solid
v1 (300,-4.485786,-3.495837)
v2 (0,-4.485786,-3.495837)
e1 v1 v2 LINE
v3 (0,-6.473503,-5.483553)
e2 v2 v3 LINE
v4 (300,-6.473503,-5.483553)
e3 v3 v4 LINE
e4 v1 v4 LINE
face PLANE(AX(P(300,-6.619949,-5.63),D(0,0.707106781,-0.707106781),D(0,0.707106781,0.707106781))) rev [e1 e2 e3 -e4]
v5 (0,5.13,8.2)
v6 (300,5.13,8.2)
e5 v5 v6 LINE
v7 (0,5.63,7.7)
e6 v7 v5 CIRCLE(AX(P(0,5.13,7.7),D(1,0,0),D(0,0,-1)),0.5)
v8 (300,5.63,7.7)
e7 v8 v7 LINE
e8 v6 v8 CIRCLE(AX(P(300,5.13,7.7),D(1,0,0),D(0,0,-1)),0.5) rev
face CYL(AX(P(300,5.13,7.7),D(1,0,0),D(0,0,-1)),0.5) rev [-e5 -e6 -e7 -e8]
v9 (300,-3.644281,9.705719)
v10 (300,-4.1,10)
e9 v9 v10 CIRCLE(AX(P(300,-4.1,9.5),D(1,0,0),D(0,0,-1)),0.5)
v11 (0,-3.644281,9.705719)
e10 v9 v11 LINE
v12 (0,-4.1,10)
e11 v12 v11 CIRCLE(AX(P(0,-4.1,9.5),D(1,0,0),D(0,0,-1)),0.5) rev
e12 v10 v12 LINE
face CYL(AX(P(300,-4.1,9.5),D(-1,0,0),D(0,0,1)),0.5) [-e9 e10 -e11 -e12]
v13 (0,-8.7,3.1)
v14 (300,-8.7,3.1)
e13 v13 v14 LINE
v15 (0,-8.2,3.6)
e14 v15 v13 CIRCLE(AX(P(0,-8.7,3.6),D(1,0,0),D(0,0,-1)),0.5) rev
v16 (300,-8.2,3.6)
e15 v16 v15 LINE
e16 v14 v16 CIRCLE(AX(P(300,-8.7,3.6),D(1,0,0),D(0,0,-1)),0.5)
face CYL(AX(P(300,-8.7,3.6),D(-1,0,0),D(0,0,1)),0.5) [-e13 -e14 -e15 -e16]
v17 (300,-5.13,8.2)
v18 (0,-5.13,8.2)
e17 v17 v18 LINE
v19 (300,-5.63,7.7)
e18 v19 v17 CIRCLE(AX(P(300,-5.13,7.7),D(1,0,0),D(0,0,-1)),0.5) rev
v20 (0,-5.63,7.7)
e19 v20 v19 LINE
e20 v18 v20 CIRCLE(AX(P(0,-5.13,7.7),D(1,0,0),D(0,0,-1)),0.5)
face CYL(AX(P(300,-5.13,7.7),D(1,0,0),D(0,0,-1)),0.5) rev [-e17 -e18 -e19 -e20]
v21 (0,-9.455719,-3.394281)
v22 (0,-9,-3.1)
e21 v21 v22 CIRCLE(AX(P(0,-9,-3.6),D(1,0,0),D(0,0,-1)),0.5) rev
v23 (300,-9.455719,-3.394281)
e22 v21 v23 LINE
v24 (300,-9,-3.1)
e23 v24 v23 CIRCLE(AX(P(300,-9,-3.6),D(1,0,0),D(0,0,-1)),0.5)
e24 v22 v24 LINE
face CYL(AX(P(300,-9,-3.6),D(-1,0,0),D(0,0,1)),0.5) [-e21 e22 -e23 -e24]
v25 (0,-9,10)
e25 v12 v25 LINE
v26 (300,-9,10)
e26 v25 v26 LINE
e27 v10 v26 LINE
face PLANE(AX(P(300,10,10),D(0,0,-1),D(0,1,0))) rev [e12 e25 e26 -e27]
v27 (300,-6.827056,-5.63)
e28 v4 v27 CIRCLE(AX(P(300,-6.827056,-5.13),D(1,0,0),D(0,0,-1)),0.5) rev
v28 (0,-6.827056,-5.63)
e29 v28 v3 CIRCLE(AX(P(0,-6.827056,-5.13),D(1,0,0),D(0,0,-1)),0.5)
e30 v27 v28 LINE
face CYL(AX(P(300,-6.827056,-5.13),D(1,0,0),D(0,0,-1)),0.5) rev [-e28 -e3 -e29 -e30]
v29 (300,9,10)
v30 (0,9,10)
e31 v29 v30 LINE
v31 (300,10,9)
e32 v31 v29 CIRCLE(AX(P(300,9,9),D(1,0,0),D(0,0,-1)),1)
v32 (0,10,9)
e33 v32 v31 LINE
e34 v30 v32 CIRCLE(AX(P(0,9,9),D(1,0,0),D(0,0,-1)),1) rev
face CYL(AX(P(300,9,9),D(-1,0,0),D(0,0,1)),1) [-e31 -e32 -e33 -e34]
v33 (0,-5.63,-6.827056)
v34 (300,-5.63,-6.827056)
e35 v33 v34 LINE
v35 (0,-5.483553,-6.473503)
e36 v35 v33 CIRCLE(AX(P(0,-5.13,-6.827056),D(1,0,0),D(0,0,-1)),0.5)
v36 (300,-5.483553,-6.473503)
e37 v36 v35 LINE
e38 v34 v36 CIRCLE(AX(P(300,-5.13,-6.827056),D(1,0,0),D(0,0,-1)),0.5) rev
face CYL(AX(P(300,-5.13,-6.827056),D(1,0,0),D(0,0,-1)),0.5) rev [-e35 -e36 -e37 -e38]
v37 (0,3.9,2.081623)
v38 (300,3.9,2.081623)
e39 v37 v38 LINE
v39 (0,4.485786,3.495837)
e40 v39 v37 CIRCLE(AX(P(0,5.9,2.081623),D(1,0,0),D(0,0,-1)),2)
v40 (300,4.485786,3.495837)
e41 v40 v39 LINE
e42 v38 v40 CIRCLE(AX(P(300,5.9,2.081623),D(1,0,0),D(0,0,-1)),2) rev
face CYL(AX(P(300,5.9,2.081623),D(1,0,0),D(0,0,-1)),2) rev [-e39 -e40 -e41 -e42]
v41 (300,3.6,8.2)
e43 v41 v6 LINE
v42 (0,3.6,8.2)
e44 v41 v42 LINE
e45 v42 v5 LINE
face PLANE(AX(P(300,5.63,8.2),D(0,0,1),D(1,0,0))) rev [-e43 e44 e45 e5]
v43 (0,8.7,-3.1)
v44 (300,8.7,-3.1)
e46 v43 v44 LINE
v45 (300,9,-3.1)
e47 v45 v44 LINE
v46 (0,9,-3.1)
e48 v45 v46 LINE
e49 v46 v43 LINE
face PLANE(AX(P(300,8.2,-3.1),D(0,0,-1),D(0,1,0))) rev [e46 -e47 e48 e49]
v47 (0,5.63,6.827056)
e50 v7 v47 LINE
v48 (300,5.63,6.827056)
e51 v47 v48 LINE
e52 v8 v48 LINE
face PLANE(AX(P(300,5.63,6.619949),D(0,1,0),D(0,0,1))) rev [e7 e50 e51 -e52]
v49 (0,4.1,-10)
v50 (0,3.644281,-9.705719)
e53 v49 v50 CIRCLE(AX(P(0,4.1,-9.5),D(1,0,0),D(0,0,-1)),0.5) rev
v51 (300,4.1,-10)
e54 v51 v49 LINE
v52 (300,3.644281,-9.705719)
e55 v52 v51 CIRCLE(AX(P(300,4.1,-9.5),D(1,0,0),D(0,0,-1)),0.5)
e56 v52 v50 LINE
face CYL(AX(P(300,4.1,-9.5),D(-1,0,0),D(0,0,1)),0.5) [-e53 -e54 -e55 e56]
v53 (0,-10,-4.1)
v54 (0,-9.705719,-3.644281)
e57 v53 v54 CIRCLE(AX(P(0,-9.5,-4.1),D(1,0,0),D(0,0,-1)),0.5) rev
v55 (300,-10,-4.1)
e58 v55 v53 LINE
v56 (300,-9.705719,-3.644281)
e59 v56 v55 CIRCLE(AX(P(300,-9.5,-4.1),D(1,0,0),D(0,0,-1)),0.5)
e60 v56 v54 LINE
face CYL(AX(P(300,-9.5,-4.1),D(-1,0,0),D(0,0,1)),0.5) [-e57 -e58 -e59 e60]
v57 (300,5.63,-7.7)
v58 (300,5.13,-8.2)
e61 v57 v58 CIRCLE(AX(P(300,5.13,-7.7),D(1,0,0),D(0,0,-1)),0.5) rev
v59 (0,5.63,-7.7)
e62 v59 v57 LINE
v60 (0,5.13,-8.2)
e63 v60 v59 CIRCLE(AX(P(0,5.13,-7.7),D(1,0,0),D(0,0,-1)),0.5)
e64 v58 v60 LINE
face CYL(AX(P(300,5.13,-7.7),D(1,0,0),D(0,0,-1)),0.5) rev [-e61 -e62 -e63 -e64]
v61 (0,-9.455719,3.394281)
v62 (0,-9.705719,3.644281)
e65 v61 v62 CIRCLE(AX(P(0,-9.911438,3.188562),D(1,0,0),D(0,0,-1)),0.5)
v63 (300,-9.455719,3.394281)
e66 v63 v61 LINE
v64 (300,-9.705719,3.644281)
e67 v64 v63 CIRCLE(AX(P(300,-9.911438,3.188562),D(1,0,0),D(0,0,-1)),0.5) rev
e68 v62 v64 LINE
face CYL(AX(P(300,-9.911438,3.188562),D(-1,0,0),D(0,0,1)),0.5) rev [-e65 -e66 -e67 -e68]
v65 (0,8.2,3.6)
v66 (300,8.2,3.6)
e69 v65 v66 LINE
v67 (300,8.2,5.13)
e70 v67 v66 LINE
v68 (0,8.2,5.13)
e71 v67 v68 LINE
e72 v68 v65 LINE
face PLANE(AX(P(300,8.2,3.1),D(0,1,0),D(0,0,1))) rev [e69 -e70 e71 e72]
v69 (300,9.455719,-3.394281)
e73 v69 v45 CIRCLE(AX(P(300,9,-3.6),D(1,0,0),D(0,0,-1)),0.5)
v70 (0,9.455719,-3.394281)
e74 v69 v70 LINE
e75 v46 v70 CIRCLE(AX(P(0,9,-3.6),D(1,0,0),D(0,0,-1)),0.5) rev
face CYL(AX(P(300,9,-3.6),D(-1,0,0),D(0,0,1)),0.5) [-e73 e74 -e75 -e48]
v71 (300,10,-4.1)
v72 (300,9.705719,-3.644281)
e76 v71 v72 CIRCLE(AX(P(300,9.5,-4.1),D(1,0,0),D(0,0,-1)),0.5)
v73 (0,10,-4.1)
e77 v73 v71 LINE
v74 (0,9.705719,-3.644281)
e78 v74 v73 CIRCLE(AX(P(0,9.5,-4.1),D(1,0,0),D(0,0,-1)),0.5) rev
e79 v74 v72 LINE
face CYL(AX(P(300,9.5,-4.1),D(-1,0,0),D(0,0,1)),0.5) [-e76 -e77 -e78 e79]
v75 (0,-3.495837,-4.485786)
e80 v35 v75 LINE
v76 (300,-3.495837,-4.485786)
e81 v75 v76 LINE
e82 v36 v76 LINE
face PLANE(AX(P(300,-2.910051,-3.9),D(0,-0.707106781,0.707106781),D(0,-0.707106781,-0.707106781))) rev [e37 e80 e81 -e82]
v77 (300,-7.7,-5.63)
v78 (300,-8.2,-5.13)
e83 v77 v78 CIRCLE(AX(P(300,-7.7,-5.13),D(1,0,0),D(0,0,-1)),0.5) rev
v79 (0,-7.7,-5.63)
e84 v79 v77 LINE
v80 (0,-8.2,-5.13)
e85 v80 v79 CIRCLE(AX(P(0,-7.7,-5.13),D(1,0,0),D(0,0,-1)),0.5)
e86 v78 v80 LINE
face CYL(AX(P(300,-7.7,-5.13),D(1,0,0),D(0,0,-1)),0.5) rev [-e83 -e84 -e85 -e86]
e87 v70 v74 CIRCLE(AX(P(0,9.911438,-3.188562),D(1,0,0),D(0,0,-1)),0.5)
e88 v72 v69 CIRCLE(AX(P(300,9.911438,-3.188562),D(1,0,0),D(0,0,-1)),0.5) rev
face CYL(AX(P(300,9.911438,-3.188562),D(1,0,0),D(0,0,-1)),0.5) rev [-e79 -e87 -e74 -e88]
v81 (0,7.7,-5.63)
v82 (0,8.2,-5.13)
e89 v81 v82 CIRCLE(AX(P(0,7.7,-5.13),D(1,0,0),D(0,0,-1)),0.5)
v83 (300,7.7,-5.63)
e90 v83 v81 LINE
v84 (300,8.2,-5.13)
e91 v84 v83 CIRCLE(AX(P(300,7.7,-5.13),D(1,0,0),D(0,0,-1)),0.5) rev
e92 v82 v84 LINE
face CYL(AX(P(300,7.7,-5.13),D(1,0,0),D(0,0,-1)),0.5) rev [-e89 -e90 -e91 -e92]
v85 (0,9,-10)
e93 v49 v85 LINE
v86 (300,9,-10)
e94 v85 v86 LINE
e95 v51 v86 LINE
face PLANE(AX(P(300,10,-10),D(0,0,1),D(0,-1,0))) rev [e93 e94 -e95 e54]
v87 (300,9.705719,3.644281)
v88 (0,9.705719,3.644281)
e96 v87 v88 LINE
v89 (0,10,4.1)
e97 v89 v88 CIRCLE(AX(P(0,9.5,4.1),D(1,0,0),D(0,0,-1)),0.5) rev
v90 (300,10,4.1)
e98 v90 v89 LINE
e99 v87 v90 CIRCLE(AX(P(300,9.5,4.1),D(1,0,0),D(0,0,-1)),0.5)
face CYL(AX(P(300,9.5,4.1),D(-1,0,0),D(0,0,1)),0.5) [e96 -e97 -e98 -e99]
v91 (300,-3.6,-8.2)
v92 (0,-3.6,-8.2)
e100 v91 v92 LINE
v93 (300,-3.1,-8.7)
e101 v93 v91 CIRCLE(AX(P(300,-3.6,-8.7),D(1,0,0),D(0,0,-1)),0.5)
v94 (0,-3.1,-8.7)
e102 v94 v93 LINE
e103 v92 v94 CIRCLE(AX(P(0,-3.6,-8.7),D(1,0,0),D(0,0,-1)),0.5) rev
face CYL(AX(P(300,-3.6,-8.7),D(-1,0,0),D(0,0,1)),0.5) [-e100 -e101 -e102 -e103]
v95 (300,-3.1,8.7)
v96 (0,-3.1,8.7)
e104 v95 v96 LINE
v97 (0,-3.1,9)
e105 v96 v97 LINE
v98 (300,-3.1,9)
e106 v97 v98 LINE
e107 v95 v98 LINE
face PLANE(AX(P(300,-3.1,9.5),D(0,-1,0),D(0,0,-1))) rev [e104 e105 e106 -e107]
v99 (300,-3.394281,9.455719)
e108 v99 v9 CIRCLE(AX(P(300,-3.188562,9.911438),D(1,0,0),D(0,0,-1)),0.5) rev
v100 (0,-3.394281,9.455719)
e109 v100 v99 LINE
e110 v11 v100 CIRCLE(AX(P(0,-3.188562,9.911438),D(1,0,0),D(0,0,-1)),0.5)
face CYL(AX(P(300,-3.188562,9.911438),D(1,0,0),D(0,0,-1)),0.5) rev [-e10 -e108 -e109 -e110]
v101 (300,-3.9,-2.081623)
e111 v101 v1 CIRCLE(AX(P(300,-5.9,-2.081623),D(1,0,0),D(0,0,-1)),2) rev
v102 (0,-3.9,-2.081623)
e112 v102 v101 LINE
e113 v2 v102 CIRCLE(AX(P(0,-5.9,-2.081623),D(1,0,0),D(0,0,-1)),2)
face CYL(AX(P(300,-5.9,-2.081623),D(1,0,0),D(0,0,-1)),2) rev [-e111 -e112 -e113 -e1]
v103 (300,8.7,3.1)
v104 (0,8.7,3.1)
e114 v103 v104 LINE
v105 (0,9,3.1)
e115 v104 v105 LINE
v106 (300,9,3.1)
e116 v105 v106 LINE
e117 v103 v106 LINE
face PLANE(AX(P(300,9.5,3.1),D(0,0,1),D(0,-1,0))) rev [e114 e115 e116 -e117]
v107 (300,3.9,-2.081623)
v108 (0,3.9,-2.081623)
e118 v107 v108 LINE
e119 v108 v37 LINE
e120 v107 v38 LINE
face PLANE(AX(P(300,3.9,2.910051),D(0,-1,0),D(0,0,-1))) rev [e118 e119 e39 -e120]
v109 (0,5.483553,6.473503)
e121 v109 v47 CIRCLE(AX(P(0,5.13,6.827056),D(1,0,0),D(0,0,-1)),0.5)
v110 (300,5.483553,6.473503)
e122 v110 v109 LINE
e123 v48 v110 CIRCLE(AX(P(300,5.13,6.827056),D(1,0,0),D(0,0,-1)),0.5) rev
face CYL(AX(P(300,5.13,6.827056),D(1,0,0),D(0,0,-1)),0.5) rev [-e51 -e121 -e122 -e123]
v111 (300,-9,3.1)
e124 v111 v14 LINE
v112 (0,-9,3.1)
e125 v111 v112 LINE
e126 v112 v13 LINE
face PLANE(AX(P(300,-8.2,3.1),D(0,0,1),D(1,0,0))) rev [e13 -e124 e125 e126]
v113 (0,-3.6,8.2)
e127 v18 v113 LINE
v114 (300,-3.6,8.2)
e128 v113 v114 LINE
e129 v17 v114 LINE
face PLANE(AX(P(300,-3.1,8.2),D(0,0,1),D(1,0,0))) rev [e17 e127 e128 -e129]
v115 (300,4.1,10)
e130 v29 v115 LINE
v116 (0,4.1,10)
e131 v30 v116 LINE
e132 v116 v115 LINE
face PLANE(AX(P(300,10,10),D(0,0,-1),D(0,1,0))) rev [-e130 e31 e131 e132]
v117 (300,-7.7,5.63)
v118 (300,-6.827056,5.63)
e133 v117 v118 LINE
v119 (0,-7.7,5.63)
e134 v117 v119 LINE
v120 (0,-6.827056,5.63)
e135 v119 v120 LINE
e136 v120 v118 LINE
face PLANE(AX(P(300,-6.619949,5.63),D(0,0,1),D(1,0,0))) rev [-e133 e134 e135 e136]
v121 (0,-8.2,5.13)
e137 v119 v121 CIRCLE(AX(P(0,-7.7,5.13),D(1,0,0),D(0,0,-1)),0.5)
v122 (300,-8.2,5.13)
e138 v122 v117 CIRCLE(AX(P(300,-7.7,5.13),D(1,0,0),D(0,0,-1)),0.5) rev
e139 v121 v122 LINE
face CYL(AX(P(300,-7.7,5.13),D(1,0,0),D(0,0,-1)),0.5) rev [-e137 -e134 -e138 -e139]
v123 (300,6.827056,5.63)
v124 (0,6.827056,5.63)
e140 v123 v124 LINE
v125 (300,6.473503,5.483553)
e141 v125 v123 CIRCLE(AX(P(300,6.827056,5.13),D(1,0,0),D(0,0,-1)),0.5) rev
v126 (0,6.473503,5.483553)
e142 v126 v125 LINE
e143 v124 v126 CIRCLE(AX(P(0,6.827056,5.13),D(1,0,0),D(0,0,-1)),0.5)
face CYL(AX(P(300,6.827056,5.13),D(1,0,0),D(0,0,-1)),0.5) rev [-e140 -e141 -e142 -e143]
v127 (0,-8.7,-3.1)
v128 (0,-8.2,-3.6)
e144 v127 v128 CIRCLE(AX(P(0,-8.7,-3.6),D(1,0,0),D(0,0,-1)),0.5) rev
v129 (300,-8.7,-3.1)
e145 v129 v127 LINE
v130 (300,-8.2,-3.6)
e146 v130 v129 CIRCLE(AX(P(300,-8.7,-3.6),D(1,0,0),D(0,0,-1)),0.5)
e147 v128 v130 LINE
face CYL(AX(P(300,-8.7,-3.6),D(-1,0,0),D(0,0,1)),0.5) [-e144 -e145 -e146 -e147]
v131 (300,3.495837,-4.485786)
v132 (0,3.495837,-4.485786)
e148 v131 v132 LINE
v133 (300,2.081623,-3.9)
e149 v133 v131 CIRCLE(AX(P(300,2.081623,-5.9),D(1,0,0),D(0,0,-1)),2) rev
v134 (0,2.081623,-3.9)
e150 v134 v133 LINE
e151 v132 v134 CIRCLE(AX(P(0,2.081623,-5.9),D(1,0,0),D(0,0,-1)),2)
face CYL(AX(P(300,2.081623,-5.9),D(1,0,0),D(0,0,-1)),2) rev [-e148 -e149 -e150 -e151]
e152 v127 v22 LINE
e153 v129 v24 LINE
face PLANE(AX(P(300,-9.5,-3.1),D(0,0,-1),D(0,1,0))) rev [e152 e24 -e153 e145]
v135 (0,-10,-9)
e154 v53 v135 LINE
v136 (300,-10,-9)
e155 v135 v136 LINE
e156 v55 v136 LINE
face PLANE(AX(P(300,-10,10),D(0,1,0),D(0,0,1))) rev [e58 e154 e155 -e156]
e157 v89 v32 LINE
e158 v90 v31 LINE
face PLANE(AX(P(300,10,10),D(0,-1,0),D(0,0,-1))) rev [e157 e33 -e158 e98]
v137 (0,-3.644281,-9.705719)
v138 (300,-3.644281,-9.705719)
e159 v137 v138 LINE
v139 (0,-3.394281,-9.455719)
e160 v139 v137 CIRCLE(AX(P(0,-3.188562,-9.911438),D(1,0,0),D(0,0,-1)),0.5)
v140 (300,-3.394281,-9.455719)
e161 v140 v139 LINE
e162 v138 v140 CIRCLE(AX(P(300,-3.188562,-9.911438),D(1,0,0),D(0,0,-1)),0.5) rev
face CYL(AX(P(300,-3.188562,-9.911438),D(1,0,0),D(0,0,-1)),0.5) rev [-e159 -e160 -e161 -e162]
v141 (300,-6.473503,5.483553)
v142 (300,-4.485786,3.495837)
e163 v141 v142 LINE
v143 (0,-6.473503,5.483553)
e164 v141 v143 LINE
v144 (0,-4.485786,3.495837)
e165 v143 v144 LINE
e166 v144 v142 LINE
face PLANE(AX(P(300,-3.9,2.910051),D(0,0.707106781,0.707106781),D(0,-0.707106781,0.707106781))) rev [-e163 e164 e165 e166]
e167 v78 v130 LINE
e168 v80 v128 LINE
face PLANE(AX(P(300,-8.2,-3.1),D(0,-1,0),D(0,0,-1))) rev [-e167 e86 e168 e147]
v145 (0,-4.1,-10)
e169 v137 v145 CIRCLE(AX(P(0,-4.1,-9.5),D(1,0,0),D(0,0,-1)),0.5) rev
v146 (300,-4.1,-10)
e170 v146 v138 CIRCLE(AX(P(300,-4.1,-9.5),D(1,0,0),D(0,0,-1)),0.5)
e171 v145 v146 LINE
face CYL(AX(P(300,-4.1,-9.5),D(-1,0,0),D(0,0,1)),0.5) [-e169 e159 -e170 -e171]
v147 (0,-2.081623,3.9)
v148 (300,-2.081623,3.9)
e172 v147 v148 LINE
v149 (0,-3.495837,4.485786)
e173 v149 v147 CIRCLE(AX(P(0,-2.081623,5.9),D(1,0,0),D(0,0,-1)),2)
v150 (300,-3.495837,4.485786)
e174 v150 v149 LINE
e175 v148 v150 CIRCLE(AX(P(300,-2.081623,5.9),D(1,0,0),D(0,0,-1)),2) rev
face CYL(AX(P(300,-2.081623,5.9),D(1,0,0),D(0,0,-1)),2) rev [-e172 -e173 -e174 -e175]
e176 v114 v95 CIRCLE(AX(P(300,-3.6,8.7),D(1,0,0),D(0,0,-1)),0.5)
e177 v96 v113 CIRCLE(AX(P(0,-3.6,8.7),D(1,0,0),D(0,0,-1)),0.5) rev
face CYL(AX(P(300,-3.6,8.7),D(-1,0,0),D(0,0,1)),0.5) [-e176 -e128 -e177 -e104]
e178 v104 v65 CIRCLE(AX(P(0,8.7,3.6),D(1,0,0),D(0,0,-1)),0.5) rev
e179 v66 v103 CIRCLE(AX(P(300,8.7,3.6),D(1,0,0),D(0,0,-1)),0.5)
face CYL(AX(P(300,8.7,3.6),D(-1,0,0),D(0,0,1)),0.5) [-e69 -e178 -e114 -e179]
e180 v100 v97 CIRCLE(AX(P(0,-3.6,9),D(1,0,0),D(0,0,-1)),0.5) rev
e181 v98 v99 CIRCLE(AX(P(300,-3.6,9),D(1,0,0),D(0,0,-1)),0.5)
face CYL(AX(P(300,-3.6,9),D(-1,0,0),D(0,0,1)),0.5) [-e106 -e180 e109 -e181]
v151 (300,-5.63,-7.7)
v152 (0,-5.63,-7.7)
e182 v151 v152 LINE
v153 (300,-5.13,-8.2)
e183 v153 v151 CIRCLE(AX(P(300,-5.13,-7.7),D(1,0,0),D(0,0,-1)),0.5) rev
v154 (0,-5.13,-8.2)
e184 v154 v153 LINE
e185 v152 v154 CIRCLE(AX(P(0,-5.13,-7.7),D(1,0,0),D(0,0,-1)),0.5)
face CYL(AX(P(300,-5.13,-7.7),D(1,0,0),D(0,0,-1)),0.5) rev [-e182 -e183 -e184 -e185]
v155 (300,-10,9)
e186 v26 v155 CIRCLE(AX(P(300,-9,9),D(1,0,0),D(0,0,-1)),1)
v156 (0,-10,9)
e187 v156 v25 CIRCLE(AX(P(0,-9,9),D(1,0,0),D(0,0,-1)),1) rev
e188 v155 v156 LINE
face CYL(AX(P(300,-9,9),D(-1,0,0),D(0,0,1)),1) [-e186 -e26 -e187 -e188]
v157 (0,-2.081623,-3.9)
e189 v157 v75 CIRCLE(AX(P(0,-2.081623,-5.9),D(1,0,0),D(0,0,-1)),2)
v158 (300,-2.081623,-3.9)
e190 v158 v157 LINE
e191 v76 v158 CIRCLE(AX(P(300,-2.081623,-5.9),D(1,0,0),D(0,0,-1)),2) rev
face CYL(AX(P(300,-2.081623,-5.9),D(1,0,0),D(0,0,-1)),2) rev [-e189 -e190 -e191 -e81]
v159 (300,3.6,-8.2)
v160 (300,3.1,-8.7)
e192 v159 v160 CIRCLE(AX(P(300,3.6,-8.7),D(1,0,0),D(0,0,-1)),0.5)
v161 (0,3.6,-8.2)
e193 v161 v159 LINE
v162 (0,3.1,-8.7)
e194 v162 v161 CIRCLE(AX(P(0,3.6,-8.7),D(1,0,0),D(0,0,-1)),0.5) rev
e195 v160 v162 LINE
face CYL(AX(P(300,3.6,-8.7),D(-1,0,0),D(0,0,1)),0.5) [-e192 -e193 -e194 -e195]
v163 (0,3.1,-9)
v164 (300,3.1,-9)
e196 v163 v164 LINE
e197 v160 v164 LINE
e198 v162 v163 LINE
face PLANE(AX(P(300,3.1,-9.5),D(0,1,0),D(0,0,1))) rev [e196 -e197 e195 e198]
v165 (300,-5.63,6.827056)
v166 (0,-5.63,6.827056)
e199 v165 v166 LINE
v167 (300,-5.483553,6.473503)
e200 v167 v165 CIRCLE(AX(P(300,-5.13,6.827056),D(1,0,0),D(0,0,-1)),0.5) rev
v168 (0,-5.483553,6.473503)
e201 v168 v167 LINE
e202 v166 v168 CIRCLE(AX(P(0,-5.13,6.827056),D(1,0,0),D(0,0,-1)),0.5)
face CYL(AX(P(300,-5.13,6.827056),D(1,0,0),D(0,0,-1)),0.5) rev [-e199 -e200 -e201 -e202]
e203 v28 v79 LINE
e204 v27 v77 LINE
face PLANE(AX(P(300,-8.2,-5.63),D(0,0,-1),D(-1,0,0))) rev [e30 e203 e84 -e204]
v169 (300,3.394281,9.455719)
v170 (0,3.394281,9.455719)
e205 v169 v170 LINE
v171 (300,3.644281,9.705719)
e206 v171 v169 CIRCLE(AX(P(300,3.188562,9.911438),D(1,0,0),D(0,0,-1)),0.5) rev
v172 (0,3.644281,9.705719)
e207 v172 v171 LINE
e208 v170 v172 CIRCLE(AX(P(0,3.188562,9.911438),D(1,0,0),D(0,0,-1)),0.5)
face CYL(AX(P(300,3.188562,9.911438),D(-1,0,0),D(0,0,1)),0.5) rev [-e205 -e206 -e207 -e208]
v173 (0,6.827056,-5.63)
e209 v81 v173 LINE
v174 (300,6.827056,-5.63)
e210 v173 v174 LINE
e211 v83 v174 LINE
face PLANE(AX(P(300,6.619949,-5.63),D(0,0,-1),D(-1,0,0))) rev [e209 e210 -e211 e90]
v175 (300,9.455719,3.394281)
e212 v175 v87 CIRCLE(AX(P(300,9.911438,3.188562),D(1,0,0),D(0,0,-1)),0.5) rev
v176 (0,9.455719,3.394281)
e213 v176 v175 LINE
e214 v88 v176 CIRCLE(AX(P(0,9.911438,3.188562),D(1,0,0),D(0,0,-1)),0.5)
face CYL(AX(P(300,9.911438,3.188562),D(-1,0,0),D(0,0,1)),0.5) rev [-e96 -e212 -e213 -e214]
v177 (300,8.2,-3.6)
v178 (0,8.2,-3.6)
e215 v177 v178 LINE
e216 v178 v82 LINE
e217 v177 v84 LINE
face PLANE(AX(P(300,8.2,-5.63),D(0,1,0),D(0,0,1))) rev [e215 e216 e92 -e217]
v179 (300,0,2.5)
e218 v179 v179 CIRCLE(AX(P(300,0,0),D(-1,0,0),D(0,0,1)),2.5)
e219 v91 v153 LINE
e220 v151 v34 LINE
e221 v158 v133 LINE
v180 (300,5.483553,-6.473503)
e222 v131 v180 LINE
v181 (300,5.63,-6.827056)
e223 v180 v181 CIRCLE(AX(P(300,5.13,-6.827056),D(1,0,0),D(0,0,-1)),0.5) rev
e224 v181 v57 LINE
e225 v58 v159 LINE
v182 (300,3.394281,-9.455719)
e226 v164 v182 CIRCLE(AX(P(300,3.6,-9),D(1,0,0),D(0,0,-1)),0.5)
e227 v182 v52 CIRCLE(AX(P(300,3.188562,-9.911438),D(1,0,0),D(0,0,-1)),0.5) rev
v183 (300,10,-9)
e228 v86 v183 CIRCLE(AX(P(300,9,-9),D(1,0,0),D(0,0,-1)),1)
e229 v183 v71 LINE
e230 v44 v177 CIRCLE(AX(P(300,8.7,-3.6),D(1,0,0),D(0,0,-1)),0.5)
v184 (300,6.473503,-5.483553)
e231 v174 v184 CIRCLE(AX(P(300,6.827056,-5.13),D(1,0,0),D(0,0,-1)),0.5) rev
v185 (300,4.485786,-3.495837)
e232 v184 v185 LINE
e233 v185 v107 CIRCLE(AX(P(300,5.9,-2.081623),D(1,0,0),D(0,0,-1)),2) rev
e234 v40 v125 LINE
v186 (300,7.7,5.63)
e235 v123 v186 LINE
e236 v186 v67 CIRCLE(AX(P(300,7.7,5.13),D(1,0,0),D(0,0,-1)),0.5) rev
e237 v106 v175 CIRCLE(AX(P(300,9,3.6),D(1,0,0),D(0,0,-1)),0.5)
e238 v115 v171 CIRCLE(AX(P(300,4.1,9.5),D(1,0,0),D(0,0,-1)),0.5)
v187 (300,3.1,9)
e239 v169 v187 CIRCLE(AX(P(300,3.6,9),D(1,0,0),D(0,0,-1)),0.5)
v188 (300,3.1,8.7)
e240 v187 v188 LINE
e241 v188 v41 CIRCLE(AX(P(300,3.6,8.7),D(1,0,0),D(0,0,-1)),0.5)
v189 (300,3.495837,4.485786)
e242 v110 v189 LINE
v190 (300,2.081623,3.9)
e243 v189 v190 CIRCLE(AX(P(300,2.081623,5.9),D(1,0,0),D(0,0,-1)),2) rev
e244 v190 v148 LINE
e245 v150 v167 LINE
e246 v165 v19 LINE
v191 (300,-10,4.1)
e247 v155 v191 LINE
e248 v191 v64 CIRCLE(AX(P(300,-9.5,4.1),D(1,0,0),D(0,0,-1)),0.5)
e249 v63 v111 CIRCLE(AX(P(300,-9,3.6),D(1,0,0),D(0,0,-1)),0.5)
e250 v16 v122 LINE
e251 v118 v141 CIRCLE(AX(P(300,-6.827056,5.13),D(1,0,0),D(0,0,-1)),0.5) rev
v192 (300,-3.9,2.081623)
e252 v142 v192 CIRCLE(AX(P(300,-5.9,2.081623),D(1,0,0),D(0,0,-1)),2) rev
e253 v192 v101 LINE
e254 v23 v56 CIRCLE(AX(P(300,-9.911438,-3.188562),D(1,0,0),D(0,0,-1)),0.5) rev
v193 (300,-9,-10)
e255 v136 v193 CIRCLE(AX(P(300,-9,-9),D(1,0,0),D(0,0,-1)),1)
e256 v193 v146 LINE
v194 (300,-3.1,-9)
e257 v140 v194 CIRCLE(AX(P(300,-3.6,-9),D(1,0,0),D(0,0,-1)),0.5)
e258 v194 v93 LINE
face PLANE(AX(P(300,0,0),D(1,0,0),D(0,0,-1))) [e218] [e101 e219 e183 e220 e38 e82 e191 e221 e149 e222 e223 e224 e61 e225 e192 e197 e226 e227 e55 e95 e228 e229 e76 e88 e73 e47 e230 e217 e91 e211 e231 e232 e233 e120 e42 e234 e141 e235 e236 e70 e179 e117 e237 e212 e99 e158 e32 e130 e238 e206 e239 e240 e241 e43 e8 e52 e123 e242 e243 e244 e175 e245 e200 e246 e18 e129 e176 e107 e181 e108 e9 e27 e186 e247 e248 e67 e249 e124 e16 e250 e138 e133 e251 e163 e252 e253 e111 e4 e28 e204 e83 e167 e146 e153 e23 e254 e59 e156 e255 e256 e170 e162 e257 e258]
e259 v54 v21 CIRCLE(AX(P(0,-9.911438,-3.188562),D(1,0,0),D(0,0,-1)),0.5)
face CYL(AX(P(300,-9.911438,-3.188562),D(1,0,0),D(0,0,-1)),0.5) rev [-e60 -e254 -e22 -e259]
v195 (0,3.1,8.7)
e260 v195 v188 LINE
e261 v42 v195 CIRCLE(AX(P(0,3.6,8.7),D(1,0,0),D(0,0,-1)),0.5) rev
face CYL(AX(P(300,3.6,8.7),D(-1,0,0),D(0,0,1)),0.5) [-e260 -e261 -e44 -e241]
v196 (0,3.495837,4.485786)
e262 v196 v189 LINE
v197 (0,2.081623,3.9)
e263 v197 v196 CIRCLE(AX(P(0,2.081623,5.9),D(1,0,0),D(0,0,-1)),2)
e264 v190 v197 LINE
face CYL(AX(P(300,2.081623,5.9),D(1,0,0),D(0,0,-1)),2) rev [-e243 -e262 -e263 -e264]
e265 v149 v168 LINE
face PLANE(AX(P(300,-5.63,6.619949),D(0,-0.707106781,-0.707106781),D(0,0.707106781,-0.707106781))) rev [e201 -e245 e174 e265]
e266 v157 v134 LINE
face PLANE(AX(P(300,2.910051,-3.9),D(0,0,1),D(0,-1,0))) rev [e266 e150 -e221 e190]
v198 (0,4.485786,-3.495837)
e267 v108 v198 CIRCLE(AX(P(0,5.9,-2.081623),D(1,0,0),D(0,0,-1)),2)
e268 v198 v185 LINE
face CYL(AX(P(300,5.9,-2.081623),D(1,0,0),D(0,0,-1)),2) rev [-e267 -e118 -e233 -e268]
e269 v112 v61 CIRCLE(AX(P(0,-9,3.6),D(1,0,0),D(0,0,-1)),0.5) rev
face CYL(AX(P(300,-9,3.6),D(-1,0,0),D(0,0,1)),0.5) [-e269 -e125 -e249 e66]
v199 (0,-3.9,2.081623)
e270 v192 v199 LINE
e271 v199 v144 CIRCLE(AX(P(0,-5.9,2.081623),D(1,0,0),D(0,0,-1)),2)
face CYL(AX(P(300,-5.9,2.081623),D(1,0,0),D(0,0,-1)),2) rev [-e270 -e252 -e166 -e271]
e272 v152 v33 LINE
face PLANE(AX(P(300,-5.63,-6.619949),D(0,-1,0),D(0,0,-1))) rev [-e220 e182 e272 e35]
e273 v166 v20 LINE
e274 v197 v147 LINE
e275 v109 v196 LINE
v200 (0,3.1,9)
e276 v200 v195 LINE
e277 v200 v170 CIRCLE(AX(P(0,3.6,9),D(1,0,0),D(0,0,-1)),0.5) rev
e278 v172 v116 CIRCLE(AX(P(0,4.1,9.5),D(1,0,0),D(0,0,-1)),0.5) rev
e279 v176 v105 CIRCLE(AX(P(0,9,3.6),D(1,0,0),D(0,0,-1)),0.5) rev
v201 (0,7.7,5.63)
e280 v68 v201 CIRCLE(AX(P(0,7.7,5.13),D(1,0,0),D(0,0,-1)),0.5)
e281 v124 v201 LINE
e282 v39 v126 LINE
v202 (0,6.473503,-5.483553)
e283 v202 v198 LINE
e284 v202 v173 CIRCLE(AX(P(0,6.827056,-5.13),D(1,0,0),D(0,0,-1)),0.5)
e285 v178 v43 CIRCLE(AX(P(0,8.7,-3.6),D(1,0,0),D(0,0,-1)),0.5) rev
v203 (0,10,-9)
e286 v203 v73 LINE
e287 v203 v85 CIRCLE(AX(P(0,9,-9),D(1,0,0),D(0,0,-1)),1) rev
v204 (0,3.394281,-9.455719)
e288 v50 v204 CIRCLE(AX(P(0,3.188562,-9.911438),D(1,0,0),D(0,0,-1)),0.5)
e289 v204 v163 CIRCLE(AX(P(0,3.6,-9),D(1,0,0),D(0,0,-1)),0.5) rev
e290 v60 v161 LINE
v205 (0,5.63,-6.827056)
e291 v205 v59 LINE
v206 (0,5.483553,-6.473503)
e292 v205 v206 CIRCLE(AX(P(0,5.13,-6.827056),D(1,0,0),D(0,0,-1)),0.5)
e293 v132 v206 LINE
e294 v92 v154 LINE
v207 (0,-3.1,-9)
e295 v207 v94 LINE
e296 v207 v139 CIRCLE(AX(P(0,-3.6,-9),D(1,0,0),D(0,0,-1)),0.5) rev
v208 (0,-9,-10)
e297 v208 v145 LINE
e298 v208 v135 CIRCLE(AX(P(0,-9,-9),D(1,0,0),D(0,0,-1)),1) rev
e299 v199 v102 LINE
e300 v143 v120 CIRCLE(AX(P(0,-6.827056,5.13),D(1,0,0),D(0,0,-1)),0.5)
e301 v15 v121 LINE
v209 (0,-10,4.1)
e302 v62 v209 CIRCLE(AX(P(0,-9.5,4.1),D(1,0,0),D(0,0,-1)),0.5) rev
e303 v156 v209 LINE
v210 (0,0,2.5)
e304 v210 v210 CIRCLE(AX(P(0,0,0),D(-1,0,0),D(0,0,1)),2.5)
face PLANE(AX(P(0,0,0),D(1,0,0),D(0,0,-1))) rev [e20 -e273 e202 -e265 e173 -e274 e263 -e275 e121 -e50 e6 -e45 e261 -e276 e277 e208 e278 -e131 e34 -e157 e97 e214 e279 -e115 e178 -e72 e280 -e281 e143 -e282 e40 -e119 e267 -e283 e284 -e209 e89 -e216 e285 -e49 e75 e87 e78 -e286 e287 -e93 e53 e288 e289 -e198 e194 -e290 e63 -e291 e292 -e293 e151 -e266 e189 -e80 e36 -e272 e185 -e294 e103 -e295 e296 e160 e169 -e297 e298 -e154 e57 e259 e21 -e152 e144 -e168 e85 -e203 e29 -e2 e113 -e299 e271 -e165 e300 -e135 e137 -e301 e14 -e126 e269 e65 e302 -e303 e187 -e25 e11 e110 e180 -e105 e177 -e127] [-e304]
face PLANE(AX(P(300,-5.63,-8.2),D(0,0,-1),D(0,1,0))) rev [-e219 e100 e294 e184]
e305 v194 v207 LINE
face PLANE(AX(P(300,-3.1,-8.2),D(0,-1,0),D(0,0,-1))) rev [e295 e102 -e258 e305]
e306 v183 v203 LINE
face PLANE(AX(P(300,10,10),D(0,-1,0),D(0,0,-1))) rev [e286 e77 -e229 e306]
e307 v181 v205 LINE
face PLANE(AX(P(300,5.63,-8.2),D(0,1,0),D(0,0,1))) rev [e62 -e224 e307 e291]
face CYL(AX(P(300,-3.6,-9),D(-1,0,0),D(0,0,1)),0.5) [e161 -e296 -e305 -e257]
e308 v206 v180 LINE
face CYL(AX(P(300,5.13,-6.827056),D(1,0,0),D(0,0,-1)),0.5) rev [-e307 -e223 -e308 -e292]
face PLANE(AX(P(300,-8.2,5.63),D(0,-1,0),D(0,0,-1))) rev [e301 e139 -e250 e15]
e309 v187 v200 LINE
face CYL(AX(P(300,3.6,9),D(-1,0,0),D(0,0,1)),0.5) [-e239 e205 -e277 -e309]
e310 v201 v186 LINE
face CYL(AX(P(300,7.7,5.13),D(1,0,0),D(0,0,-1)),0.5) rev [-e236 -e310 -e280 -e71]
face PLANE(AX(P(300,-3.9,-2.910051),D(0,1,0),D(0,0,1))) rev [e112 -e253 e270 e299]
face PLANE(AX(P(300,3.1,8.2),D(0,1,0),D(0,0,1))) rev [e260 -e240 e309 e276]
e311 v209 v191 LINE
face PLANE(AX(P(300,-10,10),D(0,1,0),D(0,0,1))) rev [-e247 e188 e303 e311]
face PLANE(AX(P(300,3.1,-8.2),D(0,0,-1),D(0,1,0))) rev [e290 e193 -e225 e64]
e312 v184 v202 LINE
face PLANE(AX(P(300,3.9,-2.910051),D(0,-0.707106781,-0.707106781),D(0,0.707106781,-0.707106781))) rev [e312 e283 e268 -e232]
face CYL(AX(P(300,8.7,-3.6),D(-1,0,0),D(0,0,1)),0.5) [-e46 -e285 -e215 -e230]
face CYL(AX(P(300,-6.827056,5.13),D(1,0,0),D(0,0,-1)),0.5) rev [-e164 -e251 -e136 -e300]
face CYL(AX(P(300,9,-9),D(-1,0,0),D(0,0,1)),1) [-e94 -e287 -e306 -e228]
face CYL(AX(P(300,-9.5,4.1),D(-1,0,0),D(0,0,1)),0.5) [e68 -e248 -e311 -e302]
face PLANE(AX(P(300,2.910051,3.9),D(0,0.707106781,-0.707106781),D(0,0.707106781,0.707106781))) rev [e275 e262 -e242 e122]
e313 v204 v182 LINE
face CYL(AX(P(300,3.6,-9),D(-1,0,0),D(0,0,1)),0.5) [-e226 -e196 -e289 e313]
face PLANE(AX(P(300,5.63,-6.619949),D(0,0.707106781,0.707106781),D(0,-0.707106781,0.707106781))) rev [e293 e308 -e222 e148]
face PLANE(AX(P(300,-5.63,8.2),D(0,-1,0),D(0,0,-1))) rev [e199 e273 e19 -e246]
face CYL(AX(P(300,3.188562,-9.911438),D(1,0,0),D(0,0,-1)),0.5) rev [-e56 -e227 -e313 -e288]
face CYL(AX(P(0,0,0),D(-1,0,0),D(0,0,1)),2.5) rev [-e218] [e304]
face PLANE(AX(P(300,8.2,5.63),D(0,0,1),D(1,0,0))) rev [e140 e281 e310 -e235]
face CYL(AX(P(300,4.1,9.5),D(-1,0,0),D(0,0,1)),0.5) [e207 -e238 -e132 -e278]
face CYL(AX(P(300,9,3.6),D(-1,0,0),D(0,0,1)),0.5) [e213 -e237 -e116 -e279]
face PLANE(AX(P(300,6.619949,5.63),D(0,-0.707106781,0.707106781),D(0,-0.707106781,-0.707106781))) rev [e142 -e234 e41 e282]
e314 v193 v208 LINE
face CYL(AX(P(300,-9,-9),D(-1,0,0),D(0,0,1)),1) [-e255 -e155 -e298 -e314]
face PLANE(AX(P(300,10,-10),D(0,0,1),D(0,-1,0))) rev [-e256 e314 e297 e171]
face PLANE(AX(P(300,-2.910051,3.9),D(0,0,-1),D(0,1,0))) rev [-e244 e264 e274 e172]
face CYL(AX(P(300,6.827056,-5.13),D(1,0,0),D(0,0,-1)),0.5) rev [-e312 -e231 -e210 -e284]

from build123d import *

# Parameters (mm, degrees)
SKETCH1_W                = 20
SKETCH1_H                = 20
BOSS_EXTRUDE1_DEPTH      = 300
FILLET1_R                = 1
CUT_EXTRUDE1_DEPTH       = 301.333148354
F_5_0_5_DIAMETER_HOLE1_D = 5
FILLET2_R                = 2
FILLET3_R                = 0.5
FILLET4_R                = 0.5
FILLET5_R                = 0.5


with BuildPart() as part:
    # Sketch1 → Boss-Extrude1 (new body)
    with BuildSketch(Plane(origin=(0, 0, 0), x_dir=(0, 0, -1), z_dir=(1, 0, 0))):
        Rectangle(SKETCH1_W, SKETCH1_H)
    extrude(amount=BOSS_EXTRUDE1_DEPTH)

    # Fillet1
    fillet1_edges = [part.edges().sort_by_distance(p)[0] for p in [
        (150, 10, 10),
        (150, 10, -10),
        (150, -10, -10),
        (150, -10, 10),
    ]]
    fillet(fillet1_edges, radius=FILLET1_R)

    # Sketch3 → Cut-Extrude1 (cut, through all)
    with BuildSketch(Plane.ZY):
        Polygon((-3.6, 10), (3.6, 10), (3.6, 9.5), (3.1, 9.5), (3.1, 8.2), (5.63, 8.2), (5.63, 6.619949494), (2.910050506, 3.9), (-2.910050506, 3.9), (-5.63, 6.619949494), (-5.63, 8.2), (-3.1, 8.2), (-3.1, 9.5), (-3.6, 9.5), align=None)
        Polygon((10, 3.6), (10, -3.6), (9.5, -3.6), (9.5, -3.1), (8.2, -3.1), (8.2, -5.63), (6.619949494, -5.63), (3.9, -2.910050506), (3.9, 2.910050506), (6.619949494, 5.63), (8.2, 5.63), (8.2, 3.1), (9.5, 3.1), (9.5, 3.6), align=None)
        Polygon((3.6, -10), (-3.6, -10), (-3.6, -9.5), (-3.1, -9.5), (-3.1, -8.2), (-5.63, -8.2), (-5.63, -6.619949494), (-2.910050506, -3.9), (2.910050506, -3.9), (5.63, -6.619949494), (5.63, -8.2), (3.1, -8.2), (3.1, -9.5), (3.6, -9.5), align=None)
        Polygon((-10, -3.6), (-10, 3.6), (-9.5, 3.6), (-9.5, 3.1), (-8.2, 3.1), (-8.2, 5.63), (-6.619949494, 5.63), (-3.9, 2.910050506), (-3.9, -2.910050506), (-6.619949494, -5.63), (-8.2, -5.63), (-8.2, -3.1), (-9.5, -3.1), (-9.5, -3.6), align=None)
    extrude(amount=-CUT_EXTRUDE1_DEPTH, mode=Mode.SUBTRACT)

    # Ø5.0 (5) Diameter Hole1 (through all)
    with Locations(Plane.ZY):
        with Locations((0, 0)):
            Hole(F_5_0_5_DIAMETER_HOLE1_D / 2)

    # Fillet2
    fillet2_edges = [part.edges().sort_by_distance(p)[0] for p in [
        (150, -3.9, -2.910050506),
        (150, -3.9, 2.910050506),
        (150, 2.910050506, -3.9),
        (150, -2.910050506, -3.9),
        (150, -2.910050506, 3.9),
        (150, 2.910050506, 3.9),
        (150, 3.9, 2.910050506),
        (150, 3.9, -2.910050506),
    ]]
    fillet(fillet2_edges, radius=FILLET2_R)

    # Fillet3
    fillet3_edges = [part.edges().sort_by_distance(p)[0] for p in [
        (150, 3.6, -10),
        (150, 3.1, -9.5),
        (150, 3.1, -8.2),
        (150, 5.63, -8.2),
        (150, 5.63, -6.619949494),
        (150, 3.6, 10),
        (150, 3.1, 9.5),
        (150, 3.1, 8.2),
        (150, 5.63, 8.2),
        (150, 5.63, 6.619949494),
        (150, 6.619949494, 5.63),
        (150, 8.2, 5.63),
        (150, 8.2, 3.1),
        (150, 9.5, 3.1),
        (150, 10, 3.6),
        (150, 9.5, -3.1),
        (150, 10, -3.6),
        (150, 8.2, -3.1),
        (150, 8.2, -5.63),
        (150, 6.619949494, -5.63),
    ]]
    fillet(fillet3_edges, radius=FILLET3_R - 0.0001)  # a hair under: the kernel refuses the full size

    # Fillet4
    fillet4_edges = [part.edges().sort_by_distance(p)[0] for p in [
        (150, -3.6, 10),
        (150, -3.1, 9.5),
        (150, -3.1, 8.2),
        (150, -5.63, 8.2),
        (150, -5.63, 6.619949494),
        (150, -6.619949494, 5.63),
        (150, -8.2, 5.63),
        (150, -8.2, 3.1),
        (150, -10, 3.6),
        (150, -9.5, 3.1),
        (150, -10, -3.6),
        (150, -9.5, -3.1),
        (150, -8.2, -3.1),
        (150, -8.2, -5.63),
        (150, -6.619949494, -5.63),
        (150, -5.63, -6.619949494),
        (150, -5.63, -8.2),
        (150, -3.1, -8.2),
        (150, -3.1, -9.5),
        (150, -3.6, -10),
    ]]
    fillet(fillet4_edges, radius=FILLET4_R - 0.0001)  # a hair under: the kernel refuses the full size

    # Fillet5
    fillet5_edges = [part.edges().sort_by_distance(p)[0] for p in [
        (150, 3.6, 9.5),
        (150, 9.5, 3.6),
        (150, 9.5, -3.6),
        (150, 3.6, -9.5),
        (150, -3.6, 9.5),
        (150, -9.5, 3.6),
        (150, -9.5, -3.6),
        (150, -3.6, -9.5),
    ]]
    fillet(fillet5_edges, radius=FILLET5_R)


solid = part.part
